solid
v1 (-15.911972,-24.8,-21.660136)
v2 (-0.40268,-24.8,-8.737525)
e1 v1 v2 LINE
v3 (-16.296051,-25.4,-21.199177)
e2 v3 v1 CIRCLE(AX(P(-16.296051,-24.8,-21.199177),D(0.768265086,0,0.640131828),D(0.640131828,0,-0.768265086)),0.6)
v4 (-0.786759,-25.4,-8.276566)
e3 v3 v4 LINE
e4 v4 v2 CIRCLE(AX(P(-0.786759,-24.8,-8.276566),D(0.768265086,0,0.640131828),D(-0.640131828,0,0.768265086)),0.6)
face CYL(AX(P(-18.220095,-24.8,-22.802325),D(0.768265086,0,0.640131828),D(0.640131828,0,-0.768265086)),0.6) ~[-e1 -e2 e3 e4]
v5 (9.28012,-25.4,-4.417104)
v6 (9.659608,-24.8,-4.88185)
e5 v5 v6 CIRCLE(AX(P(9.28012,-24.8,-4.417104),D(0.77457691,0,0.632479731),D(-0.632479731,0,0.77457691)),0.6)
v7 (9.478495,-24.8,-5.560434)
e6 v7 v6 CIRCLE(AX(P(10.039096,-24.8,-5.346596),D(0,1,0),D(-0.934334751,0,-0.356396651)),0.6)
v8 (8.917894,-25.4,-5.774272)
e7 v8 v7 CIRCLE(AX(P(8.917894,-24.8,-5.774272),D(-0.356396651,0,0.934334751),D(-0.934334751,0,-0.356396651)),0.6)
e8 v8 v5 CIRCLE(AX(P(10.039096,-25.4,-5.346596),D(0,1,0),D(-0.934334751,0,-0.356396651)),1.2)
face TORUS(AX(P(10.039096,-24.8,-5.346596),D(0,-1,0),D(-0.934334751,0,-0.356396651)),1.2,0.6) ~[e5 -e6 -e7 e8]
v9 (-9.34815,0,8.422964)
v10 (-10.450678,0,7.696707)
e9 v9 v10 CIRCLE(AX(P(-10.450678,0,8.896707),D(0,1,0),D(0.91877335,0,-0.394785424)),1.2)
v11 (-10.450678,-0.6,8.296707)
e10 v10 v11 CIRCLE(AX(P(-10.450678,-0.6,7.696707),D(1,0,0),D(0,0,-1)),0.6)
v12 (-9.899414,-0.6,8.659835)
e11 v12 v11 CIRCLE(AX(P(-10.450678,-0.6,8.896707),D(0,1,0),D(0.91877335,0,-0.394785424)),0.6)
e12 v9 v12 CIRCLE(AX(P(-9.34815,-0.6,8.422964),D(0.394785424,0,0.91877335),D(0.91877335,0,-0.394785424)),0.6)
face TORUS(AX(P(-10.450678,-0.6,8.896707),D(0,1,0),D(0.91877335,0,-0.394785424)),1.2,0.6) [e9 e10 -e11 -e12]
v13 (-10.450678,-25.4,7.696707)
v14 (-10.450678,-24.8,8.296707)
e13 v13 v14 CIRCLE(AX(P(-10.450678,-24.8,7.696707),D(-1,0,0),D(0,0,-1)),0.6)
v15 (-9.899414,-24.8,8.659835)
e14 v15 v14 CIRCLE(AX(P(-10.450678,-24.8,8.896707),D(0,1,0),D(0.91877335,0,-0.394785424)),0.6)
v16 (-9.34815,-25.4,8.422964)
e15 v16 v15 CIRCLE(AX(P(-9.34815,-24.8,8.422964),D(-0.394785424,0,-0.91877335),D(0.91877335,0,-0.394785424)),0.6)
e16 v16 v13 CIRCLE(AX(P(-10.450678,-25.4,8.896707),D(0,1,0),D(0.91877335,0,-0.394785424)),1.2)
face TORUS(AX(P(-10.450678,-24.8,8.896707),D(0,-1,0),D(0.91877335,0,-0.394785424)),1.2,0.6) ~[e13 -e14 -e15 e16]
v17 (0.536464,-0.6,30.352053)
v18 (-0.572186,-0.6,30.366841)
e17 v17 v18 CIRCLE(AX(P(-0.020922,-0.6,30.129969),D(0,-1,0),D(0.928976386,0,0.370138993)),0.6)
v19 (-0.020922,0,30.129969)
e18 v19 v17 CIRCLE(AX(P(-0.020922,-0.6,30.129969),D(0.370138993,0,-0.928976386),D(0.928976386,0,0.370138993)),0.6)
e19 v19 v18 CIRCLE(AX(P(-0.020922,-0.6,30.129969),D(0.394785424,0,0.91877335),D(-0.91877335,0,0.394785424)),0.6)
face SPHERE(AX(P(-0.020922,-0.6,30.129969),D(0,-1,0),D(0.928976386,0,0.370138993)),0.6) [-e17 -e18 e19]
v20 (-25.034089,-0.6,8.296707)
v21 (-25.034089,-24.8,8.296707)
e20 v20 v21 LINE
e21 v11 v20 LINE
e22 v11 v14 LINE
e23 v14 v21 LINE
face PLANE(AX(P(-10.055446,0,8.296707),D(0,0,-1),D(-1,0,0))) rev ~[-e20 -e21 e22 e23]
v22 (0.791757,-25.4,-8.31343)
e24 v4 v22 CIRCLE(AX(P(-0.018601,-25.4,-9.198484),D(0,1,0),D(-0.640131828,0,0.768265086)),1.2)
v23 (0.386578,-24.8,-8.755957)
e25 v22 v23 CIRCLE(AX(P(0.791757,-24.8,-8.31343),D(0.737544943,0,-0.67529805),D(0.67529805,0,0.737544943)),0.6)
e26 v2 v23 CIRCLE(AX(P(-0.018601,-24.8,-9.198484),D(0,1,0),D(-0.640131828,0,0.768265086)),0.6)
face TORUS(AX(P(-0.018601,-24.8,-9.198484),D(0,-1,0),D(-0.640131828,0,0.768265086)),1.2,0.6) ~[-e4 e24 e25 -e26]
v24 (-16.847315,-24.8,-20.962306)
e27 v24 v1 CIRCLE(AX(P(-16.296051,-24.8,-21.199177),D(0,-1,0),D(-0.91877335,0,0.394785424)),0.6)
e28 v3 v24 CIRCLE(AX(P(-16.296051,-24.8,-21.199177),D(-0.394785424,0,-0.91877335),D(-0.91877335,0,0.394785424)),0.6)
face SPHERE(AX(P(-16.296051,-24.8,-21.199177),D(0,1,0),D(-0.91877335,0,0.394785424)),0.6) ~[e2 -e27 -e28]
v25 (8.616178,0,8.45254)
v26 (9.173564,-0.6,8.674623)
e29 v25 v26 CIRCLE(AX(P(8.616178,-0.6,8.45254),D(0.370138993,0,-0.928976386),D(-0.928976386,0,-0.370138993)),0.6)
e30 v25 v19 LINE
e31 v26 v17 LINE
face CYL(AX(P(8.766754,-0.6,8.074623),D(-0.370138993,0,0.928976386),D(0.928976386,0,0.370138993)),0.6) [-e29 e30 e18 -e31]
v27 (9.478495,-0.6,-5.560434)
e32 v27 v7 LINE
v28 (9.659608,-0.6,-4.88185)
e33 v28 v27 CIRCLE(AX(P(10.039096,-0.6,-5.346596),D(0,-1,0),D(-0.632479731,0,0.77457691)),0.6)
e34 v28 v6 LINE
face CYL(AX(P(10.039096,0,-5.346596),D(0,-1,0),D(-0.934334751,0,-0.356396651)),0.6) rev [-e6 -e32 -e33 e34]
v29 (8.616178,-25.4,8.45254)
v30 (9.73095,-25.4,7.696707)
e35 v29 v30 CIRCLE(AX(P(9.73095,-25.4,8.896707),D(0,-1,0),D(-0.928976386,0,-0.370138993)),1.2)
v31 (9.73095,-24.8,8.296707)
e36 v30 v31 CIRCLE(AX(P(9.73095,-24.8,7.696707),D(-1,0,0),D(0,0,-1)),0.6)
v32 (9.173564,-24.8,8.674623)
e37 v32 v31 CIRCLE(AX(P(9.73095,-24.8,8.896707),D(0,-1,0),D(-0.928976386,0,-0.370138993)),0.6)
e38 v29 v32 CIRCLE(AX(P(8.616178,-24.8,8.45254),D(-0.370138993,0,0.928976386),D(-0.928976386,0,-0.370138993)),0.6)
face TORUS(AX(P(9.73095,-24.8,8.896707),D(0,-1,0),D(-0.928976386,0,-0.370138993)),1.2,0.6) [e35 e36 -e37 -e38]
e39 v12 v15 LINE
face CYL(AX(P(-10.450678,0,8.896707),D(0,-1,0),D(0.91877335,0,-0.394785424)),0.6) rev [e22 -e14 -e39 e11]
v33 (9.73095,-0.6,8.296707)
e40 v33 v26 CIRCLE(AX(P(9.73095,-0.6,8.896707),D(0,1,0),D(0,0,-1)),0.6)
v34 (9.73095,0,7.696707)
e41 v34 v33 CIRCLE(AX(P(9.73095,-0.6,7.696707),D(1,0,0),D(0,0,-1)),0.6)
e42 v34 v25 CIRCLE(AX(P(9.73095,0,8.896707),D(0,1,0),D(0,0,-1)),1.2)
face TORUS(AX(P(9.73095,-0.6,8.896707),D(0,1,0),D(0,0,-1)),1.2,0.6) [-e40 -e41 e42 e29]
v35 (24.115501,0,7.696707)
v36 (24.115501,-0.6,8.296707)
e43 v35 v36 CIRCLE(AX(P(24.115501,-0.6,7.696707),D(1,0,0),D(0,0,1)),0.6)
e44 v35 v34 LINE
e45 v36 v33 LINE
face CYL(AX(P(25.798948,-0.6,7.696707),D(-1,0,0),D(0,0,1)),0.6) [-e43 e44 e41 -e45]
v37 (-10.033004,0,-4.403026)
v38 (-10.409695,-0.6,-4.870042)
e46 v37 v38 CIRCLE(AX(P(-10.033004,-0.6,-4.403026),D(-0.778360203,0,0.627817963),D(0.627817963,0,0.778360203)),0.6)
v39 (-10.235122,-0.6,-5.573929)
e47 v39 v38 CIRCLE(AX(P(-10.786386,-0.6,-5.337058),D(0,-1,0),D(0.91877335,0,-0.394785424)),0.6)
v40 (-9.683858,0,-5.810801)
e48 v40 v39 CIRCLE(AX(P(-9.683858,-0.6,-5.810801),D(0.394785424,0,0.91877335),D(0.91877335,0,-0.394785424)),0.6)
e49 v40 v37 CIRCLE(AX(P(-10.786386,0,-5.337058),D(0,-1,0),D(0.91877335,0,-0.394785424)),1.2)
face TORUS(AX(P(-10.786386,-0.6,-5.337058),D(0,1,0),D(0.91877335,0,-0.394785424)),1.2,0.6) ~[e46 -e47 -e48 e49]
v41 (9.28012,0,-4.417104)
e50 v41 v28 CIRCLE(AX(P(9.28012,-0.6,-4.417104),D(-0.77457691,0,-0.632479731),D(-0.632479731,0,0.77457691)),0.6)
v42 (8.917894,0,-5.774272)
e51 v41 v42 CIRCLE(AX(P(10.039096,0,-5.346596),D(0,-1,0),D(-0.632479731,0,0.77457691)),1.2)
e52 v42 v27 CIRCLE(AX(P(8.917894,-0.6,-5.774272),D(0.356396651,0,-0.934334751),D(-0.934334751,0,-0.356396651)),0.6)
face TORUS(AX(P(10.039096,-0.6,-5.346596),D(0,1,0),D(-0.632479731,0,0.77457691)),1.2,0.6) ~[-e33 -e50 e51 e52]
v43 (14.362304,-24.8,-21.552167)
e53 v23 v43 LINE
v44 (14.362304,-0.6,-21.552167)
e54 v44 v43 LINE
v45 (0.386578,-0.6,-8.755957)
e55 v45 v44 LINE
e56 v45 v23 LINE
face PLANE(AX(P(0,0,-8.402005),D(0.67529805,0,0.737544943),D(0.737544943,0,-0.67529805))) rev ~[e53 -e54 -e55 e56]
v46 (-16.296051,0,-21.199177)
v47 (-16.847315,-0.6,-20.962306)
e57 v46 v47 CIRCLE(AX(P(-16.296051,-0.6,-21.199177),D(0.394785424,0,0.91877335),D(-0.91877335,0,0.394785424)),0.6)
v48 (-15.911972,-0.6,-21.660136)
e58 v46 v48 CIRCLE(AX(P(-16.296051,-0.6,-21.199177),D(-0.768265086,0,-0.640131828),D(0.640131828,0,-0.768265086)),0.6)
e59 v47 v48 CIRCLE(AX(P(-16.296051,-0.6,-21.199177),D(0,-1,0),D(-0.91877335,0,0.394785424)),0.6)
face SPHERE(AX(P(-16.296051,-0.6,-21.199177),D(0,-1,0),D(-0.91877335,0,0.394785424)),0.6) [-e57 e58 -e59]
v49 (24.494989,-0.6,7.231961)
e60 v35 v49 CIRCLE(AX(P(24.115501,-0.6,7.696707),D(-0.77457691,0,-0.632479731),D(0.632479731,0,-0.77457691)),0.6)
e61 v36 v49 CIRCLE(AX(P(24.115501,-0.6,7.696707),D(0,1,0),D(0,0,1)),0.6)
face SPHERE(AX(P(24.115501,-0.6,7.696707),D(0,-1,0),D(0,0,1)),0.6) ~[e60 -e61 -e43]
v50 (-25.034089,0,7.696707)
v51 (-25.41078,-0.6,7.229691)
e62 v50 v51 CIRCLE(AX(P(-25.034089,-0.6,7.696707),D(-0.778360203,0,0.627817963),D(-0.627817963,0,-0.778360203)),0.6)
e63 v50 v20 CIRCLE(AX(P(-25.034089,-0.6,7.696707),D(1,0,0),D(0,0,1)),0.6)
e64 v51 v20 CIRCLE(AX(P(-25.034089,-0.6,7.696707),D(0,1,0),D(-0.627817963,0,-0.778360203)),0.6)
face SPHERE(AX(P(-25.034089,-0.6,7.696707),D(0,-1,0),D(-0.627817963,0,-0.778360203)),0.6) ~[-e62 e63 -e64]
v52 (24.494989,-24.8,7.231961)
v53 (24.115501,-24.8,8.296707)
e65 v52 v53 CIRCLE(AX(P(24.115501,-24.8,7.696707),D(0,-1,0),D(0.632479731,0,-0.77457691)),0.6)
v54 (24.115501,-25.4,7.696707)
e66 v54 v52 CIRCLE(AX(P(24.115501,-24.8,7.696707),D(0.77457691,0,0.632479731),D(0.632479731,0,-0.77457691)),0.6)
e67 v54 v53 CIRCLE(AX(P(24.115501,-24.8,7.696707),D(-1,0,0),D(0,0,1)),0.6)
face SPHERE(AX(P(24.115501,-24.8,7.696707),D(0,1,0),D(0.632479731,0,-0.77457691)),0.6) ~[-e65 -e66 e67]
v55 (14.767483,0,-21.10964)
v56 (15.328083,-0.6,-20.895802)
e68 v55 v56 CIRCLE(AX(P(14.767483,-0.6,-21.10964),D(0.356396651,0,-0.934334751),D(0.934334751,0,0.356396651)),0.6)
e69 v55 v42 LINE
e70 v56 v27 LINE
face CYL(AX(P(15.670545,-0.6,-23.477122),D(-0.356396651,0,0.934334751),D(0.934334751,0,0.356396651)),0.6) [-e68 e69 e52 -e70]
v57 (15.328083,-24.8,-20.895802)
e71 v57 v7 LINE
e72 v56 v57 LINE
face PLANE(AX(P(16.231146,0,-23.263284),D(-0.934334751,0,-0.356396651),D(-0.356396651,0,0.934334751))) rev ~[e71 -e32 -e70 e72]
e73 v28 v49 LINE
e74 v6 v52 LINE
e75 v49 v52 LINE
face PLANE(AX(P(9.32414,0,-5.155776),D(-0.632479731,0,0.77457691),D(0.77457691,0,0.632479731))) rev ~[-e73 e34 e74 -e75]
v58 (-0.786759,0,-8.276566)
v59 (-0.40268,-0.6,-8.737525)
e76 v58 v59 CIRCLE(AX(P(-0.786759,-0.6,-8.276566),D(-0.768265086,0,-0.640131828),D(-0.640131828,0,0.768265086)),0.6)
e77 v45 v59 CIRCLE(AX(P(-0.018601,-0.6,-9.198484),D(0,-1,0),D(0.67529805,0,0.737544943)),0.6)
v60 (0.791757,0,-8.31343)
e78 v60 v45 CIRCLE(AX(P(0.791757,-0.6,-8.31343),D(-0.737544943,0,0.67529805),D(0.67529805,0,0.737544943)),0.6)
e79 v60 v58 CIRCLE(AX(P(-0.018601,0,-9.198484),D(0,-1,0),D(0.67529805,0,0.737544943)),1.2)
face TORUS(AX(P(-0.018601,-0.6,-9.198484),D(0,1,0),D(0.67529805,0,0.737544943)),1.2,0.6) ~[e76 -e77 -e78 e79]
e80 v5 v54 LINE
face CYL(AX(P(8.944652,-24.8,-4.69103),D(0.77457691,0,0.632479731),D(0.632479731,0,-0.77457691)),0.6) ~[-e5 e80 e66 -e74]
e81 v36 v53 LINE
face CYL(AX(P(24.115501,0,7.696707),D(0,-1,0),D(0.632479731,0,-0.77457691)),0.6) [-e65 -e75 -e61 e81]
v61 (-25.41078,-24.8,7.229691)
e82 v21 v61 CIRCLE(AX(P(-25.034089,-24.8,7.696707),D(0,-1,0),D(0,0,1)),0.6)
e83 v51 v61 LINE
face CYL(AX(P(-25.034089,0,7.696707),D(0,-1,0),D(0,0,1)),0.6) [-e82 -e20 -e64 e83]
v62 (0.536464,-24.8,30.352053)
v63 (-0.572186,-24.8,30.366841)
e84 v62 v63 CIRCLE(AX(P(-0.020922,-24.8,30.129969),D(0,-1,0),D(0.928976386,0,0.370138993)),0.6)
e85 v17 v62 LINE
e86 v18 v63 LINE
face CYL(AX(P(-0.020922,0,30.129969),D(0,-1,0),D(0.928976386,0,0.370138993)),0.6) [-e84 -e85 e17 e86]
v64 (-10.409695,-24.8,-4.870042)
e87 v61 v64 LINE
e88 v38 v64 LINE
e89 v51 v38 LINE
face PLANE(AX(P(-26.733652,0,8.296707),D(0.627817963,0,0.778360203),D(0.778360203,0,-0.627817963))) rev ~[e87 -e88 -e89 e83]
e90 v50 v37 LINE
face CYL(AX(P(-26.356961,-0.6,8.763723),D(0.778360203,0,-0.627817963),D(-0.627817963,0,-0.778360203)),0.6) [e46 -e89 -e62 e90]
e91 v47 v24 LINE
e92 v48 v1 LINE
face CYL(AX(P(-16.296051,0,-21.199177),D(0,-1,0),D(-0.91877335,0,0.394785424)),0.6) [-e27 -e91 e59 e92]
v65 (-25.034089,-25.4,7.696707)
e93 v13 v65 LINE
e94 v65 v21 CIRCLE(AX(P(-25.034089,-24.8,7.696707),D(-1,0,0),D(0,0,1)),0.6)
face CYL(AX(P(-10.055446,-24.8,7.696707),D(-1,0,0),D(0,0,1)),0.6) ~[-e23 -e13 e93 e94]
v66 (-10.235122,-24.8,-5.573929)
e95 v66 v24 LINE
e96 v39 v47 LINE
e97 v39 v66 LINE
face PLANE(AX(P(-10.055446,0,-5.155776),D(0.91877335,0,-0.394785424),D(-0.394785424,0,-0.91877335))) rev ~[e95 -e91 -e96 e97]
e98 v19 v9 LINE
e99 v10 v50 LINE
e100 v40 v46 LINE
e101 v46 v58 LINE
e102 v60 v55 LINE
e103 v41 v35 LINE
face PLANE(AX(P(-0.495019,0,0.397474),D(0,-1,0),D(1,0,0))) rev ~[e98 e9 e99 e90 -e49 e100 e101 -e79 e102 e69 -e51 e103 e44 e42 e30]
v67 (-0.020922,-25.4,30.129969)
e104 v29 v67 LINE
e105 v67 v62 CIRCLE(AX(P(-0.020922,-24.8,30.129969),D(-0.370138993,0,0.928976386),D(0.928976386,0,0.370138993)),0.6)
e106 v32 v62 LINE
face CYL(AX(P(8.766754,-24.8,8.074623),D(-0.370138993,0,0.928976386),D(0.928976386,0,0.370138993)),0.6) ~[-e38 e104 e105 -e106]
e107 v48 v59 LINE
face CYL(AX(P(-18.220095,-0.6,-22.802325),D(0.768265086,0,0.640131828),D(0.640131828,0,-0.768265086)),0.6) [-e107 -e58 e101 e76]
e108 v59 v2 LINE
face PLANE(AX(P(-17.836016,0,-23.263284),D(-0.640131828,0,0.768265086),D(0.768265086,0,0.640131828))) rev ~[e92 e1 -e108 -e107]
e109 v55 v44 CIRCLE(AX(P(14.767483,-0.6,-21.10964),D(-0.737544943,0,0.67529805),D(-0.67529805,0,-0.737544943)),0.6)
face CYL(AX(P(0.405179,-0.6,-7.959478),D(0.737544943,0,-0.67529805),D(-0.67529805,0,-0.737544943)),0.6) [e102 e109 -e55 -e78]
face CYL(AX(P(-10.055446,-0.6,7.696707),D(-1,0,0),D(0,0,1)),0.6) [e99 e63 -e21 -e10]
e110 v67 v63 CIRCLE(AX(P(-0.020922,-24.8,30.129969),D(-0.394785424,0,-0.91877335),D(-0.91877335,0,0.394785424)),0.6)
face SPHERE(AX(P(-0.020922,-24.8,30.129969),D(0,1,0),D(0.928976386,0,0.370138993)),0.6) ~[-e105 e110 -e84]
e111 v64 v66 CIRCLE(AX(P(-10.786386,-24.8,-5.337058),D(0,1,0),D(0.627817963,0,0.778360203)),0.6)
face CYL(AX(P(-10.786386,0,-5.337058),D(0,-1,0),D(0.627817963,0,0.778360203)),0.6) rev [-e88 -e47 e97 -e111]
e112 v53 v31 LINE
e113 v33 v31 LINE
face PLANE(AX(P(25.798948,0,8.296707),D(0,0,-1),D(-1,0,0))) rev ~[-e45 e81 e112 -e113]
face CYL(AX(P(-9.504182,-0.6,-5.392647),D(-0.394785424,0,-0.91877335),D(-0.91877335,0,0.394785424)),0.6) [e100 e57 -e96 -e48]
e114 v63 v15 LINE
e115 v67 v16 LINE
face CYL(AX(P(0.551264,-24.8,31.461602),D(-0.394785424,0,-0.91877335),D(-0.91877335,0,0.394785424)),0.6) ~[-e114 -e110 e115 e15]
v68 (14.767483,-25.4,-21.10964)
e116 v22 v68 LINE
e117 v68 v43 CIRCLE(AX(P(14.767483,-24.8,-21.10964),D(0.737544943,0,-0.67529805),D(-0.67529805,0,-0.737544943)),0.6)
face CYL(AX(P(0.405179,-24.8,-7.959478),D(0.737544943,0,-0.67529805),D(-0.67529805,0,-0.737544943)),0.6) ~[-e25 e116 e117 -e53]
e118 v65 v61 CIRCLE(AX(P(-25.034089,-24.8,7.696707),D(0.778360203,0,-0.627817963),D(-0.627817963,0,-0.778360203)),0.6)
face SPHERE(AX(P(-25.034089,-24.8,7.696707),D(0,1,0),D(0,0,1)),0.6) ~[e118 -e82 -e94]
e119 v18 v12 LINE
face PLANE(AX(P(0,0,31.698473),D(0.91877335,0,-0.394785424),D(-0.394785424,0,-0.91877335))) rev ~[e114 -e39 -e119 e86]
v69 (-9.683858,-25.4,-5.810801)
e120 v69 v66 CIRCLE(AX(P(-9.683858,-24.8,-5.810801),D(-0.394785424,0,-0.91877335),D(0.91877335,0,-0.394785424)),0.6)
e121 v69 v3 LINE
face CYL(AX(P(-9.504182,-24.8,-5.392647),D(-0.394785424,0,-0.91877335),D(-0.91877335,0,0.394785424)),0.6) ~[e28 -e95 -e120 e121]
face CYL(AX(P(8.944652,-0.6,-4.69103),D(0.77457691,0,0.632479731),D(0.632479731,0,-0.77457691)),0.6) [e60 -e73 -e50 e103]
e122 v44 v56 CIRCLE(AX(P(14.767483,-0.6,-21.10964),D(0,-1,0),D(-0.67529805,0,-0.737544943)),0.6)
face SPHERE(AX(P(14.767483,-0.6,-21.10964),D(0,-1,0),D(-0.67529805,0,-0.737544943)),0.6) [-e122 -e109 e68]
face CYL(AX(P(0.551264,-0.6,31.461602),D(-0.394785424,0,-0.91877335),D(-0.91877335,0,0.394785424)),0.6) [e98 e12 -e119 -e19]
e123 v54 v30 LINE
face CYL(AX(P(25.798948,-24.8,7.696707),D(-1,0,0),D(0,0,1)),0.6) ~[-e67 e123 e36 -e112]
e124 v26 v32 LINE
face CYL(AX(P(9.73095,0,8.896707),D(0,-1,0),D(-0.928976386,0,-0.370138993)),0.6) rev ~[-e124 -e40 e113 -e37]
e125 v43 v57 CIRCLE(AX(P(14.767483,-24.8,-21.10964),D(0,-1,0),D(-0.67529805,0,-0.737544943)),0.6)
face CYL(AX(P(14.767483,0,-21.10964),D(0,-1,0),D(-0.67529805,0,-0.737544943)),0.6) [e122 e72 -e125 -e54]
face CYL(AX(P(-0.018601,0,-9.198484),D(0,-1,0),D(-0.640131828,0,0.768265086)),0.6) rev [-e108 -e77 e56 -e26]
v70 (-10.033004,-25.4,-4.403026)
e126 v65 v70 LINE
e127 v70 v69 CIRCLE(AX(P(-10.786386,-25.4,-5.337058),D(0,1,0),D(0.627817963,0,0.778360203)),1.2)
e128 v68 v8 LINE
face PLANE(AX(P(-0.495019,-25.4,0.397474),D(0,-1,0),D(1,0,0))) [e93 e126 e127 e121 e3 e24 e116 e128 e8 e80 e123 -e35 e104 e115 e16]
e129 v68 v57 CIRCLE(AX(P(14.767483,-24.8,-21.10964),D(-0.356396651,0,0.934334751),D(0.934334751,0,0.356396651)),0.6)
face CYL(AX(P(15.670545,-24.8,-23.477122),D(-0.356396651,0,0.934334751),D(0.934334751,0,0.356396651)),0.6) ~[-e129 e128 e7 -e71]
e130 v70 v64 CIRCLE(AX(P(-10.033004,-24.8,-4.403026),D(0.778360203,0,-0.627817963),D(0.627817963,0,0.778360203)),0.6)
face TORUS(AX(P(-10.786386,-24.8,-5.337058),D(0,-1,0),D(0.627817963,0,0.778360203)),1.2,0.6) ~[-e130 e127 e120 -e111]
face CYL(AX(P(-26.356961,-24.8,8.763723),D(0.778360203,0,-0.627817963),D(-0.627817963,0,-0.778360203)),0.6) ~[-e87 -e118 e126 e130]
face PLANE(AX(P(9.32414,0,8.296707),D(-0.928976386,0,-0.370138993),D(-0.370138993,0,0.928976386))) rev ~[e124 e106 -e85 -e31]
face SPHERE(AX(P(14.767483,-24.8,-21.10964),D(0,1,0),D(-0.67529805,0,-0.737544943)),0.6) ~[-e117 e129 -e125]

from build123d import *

# Parameters (mm, degrees)
F1_DEPTH = 25.4
F2_R     = 0.6


with BuildPart() as f1:
    # F0 (on Front) → F1 (new body)
    with BuildSketch(Plane.XZ):
        Polygon((9.3241402825, 8.2967067137), (0, 31.6984727979), (-10.0554463643, 8.2967067137), (-26.7336517572, 8.2967067137), (-10.0554463643, -5.155775696), (-17.8360161943, -23.2632836642), (0, -8.402004838), (16.2311457098, -23.2632836642), (9.3241402825, -5.155775696), (25.7989484817, 8.2967067137), align=None)
    extrude(amount=F1_DEPTH)

    # F2
    f2_edges = [f1.edges().sort_by_distance(p)[0] for p in [
        (4.66207, -25.4, 19.99759),
        (-5.027723, -25.4, 19.99759),
        (-18.394549, -25.4, 8.296707),
        (-18.394549, -25.4, 1.570466),
        (-13.945731, -25.4, -14.20953),
        (-8.918008, -25.4, -15.832644),
        (8.115573, -25.4, -15.832644),
        (12.777643, -25.4, -14.20953),
        (17.561544, -25.4, 1.570466),
        (17.561544, -25.4, 8.296707),
        (25.798948, -12.7, 8.296707),
        (9.32414, -12.7, 8.296707),
        (17.561544, 0, 8.296707),
        (0, -12.7, 31.698473),
        (4.66207, 0, 19.99759),
        (-10.055446, -12.7, 8.296707),
        (-5.027723, 0, 19.99759),
        (-10.055446, -12.7, -5.155776),
        (-17.836016, -12.7, -23.263284),
        (-13.945731, 0, -14.20953),
        (-26.733652, -12.7, 8.296707),
        (-18.394549, 0, 1.570466),
        (0, -12.7, -8.402005),
        (16.231146, -12.7, -23.263284),
        (8.115573, 0, -15.832644),
        (-8.918008, 0, -15.832644),
        (9.32414, -12.7, -5.155776),
        (17.561544, 0, 1.570466),
        (12.777643, 0, -14.20953),
        (-18.394549, 0, 8.296707),
    ]]
    fillet(f2_edges, radius=F2_R)


solid = f1.part
